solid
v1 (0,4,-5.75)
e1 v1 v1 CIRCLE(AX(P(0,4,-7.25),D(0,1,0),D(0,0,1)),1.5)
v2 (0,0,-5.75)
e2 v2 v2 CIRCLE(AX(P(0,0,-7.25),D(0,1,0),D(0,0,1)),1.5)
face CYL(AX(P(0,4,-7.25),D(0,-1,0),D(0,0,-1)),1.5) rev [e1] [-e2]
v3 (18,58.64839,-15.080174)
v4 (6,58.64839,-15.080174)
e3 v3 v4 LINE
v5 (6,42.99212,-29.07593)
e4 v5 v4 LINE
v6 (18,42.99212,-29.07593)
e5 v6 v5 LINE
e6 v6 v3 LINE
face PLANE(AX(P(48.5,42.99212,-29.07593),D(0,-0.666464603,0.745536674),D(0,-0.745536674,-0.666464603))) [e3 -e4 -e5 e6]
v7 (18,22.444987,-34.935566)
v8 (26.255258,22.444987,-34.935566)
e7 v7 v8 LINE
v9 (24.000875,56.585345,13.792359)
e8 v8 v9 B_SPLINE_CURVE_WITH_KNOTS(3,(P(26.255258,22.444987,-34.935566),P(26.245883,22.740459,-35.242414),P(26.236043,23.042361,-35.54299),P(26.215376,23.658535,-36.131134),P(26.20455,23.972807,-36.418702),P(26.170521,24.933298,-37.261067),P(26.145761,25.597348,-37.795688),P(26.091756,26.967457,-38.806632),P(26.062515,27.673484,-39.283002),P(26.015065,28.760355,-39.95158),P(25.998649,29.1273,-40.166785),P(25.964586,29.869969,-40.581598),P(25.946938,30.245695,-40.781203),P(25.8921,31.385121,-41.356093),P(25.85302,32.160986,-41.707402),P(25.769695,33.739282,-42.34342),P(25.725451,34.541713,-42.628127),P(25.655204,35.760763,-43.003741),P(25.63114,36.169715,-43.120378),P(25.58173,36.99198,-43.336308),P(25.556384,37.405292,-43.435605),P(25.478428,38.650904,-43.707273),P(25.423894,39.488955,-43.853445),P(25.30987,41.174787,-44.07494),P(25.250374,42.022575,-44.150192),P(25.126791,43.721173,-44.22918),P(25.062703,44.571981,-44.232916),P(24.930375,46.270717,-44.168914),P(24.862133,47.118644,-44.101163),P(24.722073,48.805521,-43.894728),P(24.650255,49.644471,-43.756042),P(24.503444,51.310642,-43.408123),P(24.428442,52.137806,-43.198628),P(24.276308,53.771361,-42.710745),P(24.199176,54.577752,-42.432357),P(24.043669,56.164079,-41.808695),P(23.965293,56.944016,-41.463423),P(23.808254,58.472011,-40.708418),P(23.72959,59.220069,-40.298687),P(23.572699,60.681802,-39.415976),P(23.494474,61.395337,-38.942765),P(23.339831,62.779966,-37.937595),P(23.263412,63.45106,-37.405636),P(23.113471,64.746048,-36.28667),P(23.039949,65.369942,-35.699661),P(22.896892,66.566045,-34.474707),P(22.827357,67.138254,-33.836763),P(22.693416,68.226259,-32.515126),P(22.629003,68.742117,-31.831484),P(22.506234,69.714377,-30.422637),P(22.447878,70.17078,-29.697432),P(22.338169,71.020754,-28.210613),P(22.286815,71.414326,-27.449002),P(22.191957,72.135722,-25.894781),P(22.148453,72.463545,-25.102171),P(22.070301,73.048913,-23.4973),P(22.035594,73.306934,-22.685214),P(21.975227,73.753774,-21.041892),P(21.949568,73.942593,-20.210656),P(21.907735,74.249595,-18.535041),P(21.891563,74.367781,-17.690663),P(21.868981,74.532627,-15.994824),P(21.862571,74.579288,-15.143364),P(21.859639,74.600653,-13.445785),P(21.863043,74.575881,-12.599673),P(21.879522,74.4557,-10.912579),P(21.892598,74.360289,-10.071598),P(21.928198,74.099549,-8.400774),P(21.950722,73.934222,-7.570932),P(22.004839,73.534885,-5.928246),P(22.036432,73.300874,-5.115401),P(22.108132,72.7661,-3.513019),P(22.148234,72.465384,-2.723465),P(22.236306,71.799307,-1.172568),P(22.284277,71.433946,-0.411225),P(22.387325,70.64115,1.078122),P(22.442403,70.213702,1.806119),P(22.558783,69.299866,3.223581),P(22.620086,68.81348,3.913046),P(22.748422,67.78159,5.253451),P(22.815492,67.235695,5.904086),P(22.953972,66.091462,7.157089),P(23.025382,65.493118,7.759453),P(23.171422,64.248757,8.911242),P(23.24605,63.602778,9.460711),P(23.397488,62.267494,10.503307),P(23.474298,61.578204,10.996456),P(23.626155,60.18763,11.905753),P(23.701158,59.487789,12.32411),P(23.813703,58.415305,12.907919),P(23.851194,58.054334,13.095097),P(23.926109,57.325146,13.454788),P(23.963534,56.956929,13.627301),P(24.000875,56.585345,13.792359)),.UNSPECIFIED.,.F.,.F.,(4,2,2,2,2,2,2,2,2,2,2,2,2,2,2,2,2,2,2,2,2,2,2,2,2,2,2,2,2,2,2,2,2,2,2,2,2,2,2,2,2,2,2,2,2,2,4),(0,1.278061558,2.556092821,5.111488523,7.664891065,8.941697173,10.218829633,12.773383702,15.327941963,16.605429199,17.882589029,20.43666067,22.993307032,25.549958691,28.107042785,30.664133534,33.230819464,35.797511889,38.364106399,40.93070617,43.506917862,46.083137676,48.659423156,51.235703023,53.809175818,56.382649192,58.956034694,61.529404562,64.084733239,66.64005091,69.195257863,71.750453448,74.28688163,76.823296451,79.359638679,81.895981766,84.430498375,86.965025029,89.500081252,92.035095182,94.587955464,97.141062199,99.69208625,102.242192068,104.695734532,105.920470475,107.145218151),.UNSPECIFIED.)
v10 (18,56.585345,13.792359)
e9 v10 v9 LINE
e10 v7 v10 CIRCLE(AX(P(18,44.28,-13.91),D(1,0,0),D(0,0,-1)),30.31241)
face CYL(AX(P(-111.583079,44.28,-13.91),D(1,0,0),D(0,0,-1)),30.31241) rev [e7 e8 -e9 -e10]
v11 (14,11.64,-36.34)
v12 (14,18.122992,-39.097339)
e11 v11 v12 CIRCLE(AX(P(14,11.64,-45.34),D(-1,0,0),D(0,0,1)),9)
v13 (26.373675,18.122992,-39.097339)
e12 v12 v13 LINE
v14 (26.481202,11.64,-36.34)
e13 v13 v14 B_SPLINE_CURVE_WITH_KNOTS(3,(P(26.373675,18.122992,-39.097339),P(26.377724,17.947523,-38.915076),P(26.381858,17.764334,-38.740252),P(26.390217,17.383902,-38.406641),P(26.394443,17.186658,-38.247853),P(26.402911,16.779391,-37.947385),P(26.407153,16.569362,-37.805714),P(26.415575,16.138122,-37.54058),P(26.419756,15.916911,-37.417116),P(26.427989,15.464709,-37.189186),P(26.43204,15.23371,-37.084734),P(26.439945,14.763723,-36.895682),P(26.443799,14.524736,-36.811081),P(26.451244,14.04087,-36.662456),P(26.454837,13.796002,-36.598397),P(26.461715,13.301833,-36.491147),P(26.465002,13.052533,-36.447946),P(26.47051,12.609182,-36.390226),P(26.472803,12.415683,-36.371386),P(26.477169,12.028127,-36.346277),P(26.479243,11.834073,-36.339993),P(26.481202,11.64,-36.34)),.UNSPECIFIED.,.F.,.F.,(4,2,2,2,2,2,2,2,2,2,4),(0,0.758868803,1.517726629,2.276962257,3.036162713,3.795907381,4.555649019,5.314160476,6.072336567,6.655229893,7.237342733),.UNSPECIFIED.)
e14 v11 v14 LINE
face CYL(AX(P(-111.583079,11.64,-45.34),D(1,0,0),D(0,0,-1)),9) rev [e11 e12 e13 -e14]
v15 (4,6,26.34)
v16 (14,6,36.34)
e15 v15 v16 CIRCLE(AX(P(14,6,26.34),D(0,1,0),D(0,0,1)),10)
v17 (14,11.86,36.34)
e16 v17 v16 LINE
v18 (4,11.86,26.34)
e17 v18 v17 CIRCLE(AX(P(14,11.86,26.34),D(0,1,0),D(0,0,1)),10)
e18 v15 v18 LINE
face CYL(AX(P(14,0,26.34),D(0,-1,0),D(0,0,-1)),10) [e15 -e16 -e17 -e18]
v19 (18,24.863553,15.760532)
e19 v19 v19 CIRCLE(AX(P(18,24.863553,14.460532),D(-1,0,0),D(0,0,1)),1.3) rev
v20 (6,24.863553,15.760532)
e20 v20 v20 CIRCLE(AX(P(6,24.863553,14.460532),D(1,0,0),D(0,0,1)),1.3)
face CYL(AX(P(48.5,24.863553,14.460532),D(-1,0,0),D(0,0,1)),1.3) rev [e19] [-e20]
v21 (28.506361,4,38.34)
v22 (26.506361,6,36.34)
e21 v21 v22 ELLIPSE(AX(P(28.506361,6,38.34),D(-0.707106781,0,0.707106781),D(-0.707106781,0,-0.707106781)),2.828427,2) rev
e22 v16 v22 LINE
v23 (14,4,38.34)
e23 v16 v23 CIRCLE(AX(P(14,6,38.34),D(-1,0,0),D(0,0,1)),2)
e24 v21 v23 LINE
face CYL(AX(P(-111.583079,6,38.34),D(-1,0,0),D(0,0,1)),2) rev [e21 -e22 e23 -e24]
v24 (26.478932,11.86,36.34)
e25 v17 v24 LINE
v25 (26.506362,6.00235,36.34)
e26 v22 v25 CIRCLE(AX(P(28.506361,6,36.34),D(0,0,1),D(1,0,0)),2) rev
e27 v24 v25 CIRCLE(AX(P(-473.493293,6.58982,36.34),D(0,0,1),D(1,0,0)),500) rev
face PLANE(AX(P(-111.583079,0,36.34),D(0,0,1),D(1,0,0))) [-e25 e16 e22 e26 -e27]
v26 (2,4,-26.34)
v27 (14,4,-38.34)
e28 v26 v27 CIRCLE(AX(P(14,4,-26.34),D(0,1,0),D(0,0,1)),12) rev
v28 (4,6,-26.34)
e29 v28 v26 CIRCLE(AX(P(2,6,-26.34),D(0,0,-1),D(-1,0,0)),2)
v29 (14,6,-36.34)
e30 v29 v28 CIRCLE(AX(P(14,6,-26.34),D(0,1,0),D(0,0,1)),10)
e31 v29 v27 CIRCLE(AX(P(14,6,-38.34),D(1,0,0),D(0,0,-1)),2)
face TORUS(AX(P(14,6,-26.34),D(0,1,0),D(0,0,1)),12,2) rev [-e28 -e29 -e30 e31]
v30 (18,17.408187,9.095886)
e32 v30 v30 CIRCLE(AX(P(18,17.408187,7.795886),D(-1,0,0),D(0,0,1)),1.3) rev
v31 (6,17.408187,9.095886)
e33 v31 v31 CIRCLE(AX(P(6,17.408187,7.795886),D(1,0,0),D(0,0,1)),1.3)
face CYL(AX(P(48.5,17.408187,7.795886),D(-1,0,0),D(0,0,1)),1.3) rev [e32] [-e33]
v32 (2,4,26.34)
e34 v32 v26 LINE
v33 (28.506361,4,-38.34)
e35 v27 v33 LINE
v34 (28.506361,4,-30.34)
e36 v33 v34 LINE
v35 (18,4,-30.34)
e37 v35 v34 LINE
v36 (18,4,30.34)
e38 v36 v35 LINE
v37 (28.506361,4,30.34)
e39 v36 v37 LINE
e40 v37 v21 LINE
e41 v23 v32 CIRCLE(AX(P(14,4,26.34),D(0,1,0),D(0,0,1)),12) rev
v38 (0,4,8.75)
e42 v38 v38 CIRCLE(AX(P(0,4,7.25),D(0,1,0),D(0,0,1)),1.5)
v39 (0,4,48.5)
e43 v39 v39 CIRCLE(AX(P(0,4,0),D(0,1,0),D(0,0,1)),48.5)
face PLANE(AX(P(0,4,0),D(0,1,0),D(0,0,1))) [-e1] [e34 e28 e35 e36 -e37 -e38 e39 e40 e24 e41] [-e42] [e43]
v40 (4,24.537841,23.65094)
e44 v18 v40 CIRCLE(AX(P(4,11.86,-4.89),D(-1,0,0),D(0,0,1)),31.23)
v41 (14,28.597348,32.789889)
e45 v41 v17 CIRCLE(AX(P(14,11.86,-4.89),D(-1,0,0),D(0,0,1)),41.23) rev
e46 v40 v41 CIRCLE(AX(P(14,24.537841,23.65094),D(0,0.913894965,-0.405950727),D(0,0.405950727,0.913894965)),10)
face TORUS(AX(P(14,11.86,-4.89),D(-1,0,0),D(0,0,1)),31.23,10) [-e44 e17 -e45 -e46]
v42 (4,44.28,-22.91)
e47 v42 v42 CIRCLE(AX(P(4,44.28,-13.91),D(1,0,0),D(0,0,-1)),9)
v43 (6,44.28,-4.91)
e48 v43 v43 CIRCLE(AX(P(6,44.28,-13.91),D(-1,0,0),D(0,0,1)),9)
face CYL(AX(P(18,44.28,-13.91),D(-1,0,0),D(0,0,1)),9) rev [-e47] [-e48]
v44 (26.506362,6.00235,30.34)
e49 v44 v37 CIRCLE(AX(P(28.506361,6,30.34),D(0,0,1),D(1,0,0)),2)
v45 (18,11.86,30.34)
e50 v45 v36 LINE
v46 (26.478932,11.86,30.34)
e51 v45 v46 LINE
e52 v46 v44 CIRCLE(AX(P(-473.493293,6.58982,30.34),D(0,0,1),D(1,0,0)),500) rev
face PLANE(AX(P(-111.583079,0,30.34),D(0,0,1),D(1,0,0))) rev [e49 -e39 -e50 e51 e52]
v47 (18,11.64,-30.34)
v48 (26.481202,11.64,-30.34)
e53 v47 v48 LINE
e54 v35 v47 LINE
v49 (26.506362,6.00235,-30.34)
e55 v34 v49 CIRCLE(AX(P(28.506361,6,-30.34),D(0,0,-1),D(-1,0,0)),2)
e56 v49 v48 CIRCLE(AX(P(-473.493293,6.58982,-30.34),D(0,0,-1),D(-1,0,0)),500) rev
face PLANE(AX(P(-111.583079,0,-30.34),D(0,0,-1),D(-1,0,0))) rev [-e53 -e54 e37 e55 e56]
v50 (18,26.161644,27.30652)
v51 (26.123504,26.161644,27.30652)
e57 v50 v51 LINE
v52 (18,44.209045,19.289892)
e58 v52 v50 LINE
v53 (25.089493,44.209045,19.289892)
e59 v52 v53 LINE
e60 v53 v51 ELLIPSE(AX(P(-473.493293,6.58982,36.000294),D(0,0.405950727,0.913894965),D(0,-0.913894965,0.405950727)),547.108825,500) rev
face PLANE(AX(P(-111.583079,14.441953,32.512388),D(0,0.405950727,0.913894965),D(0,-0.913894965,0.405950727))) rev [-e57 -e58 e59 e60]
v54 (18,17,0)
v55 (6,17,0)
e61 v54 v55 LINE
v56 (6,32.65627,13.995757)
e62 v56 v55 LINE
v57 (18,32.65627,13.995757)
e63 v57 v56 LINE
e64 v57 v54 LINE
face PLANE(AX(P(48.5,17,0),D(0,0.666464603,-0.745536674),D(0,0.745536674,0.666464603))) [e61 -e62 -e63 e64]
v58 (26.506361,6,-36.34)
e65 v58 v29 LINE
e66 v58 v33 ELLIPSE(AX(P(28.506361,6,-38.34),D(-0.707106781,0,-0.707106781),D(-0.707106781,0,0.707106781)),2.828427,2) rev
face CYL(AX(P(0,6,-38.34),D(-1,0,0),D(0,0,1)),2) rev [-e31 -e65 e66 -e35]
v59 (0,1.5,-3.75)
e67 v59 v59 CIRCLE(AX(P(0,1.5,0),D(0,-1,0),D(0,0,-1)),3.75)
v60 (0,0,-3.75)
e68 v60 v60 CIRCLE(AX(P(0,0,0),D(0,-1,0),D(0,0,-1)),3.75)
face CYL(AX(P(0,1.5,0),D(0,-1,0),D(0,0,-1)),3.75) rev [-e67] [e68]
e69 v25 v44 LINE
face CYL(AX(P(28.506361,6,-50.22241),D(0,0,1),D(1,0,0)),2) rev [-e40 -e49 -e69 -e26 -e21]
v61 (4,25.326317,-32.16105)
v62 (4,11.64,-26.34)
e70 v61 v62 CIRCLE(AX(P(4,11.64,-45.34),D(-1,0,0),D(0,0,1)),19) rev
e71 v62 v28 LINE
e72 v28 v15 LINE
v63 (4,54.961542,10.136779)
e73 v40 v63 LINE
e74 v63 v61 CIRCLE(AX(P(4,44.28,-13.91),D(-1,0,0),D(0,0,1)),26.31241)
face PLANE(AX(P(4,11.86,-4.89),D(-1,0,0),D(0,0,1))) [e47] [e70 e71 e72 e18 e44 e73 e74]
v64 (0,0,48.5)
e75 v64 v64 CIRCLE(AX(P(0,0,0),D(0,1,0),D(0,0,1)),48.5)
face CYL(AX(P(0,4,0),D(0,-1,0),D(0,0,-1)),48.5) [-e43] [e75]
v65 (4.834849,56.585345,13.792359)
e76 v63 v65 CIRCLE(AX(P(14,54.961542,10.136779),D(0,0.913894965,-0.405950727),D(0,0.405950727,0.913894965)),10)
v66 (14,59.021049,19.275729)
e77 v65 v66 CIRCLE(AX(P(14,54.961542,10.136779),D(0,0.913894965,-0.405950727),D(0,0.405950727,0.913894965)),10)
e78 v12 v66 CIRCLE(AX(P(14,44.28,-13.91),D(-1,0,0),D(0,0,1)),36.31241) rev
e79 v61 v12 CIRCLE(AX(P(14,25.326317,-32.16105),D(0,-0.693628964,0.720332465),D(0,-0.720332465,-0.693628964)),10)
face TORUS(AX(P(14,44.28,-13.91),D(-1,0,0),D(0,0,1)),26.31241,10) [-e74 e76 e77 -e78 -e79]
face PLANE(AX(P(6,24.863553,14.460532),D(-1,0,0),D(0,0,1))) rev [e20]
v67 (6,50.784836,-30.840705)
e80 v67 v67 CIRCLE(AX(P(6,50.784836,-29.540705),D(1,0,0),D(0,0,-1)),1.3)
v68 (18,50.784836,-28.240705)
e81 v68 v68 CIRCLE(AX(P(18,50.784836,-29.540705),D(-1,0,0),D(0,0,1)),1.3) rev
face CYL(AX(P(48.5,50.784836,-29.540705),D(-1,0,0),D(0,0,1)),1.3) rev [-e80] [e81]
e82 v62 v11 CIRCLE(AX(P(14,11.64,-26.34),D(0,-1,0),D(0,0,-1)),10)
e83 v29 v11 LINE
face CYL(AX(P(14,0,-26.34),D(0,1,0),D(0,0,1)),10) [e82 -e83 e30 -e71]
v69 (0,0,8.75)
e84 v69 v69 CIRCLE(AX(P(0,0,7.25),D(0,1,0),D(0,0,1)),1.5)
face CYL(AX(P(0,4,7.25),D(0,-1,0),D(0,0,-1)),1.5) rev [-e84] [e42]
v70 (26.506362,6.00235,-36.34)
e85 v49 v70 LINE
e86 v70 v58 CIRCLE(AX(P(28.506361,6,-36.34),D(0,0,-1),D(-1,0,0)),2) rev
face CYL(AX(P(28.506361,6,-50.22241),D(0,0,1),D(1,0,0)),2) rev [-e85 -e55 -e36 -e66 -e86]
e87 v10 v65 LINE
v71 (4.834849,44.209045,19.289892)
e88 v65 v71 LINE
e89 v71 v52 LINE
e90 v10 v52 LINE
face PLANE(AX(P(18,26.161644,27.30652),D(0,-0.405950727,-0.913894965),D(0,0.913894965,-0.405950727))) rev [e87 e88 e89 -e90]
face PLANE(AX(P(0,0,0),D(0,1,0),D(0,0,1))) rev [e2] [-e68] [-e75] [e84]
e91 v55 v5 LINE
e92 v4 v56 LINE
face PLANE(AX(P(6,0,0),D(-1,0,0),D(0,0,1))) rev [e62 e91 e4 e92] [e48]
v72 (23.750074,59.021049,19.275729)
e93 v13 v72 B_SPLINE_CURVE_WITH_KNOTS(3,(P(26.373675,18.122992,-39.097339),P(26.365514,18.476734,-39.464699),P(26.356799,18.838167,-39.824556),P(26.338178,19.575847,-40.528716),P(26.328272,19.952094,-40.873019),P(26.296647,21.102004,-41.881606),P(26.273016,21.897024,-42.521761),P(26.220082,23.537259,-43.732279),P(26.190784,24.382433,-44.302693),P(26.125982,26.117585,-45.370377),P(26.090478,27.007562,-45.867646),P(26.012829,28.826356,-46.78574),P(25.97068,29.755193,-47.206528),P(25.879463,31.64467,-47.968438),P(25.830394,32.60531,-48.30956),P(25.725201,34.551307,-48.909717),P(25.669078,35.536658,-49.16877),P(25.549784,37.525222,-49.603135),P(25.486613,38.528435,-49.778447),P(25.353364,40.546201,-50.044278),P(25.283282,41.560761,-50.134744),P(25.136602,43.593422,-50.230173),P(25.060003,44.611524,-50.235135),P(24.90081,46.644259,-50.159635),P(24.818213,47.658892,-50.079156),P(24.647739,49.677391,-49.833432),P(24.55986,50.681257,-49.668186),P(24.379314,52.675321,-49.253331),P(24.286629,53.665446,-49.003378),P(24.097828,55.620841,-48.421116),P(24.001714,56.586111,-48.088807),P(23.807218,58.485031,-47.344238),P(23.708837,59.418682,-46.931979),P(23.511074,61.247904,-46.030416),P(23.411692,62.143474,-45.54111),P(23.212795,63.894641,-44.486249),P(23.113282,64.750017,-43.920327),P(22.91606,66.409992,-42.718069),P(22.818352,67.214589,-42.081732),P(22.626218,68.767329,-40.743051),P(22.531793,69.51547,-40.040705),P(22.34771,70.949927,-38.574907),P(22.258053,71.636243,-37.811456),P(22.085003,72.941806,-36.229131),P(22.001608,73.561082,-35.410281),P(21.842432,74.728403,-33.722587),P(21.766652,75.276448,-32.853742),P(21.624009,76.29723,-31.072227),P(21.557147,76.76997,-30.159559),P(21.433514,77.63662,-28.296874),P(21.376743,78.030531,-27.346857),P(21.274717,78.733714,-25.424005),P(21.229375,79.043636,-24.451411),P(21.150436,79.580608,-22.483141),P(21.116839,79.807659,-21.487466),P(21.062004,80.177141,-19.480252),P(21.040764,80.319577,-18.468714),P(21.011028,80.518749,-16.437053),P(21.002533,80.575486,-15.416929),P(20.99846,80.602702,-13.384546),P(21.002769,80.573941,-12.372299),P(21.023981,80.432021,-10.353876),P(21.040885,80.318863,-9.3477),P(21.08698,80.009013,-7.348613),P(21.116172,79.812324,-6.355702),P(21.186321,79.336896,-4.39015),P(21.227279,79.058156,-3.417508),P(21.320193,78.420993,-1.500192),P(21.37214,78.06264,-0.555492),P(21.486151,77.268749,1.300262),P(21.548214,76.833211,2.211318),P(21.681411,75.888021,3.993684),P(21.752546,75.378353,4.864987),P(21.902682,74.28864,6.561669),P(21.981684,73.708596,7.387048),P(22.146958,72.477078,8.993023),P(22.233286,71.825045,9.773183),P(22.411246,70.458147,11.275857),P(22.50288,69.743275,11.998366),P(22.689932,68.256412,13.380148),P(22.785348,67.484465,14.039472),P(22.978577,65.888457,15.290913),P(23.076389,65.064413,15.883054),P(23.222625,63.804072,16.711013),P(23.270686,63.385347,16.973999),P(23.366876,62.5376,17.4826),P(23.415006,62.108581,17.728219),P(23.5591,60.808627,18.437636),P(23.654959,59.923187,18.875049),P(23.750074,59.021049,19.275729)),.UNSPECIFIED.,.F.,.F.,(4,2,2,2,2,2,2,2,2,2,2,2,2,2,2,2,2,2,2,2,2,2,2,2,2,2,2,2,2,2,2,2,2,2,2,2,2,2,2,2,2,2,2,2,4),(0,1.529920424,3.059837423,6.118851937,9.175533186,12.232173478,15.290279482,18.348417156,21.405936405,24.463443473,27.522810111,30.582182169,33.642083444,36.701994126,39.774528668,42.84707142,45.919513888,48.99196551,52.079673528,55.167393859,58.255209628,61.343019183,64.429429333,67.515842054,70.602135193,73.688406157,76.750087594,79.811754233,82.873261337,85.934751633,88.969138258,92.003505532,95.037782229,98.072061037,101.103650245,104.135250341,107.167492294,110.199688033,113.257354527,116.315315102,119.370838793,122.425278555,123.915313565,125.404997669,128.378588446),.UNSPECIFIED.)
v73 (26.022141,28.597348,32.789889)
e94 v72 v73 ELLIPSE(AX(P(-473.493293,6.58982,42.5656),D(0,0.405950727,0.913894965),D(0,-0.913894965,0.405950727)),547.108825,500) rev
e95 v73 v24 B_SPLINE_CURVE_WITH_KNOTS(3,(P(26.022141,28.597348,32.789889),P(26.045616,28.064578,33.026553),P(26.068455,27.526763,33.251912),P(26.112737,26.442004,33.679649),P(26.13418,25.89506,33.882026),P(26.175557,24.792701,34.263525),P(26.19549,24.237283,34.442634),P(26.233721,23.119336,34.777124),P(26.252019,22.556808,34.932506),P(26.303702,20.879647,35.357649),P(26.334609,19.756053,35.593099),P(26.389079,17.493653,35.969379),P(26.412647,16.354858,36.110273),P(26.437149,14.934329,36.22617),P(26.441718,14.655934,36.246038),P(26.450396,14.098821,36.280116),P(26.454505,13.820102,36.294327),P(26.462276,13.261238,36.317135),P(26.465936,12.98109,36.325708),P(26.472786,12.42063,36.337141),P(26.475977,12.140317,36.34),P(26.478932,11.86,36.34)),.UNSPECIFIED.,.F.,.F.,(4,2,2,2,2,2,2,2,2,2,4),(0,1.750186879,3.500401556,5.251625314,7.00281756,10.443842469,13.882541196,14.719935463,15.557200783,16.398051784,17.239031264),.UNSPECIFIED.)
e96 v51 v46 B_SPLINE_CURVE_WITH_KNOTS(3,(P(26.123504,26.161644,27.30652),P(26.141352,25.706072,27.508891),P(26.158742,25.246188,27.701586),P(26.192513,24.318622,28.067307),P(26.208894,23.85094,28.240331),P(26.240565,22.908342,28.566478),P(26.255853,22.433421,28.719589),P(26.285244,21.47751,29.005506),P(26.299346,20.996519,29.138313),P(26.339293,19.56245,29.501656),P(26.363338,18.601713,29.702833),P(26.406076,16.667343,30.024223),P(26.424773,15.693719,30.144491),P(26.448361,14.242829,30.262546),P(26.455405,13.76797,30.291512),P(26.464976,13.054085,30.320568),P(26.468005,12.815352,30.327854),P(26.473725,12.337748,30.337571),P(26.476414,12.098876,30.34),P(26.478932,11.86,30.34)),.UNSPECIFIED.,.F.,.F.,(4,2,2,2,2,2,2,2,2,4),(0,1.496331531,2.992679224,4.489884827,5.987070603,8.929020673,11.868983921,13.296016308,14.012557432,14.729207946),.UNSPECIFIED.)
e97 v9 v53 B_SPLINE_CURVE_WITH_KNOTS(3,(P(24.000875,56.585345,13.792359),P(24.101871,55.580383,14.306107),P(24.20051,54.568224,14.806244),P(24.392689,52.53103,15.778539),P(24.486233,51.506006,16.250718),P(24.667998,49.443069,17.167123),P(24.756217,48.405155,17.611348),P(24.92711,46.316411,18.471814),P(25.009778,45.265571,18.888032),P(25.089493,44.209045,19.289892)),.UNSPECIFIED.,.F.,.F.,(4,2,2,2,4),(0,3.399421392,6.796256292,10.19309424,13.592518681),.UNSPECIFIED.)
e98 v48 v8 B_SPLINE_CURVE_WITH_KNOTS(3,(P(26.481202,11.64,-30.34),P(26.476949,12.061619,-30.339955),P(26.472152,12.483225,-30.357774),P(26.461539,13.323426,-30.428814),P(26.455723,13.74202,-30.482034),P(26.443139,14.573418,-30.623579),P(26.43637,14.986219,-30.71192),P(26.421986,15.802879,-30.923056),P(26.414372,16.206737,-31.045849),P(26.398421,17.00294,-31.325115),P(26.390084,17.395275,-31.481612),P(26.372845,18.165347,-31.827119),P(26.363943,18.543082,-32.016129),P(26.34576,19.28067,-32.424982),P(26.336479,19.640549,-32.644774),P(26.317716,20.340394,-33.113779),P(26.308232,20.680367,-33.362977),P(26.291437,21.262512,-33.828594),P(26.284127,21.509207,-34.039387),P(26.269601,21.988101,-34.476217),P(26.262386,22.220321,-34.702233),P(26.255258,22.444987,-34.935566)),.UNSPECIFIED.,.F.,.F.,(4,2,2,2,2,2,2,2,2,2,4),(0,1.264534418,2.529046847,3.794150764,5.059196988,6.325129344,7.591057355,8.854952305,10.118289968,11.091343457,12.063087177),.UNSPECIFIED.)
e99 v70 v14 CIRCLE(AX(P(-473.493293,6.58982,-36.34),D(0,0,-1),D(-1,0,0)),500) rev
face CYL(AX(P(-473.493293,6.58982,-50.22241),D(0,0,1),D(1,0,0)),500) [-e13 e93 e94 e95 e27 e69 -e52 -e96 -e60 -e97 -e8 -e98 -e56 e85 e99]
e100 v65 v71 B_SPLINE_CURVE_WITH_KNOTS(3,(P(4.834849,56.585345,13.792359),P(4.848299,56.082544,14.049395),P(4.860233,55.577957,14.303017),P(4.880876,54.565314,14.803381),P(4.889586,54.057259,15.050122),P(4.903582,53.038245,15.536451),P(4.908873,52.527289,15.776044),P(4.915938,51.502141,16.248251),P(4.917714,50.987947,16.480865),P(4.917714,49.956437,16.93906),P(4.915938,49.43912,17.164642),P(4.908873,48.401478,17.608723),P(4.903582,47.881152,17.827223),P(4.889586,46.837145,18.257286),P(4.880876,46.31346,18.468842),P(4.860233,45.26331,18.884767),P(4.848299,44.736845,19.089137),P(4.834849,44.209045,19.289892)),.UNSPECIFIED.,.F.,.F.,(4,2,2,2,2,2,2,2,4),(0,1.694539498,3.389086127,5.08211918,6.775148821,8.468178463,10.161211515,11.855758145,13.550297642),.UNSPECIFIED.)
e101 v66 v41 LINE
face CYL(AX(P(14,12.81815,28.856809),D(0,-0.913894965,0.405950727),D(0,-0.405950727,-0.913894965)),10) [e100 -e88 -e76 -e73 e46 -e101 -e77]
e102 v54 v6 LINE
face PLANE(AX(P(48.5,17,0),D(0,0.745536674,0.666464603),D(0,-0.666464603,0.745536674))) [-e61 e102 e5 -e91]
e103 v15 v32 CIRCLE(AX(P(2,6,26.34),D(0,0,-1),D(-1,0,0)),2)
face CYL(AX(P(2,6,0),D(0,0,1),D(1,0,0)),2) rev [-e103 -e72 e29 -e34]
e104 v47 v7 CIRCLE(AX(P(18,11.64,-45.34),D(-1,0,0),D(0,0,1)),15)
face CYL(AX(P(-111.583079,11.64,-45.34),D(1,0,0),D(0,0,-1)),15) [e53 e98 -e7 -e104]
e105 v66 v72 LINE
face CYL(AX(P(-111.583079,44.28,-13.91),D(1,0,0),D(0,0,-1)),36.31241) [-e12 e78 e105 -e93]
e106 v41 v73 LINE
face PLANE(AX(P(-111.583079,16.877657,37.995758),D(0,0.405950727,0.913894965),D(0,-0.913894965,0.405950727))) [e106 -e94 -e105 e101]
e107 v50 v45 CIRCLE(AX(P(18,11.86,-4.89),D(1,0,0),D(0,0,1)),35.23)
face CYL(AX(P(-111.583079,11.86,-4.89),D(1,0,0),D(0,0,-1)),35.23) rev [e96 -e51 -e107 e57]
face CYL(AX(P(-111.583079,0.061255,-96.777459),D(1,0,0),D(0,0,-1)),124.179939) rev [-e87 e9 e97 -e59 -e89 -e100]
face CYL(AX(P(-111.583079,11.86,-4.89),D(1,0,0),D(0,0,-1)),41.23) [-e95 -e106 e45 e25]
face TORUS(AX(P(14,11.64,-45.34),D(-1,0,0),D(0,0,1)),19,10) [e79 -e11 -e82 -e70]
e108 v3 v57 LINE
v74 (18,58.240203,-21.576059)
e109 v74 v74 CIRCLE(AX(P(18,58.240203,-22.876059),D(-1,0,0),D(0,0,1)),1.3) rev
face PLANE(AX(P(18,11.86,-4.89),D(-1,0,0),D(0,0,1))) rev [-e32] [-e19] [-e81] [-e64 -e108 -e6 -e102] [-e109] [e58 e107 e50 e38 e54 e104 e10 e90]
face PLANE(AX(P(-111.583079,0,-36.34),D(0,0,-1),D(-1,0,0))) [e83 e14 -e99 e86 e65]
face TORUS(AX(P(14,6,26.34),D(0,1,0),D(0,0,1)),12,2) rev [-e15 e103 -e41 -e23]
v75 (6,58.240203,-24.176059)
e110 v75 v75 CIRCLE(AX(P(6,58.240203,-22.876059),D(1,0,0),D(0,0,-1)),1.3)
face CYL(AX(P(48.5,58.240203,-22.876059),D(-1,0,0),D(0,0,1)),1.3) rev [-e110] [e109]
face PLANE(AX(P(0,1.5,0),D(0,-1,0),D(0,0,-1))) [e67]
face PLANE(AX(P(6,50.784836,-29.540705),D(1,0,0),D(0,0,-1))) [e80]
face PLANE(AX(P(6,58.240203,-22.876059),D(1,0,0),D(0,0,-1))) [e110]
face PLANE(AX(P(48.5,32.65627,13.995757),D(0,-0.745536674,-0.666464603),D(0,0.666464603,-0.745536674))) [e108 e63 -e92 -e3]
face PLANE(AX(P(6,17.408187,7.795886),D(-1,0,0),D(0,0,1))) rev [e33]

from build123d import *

# Parameters (mm, degrees)
SKETCH2_R                       = 48.5
SKETCH2_R_2                     = 1.5000000000000002
BOSS_EXTRUDE1_DEPTH             = 4
SKETCH3_R                       = 3.75
CUT_EXTRUDE1_DEPTH              = 1.5
BOSS_EXTRUDE3_START             = 4
SKETCH5_R                       = 9
BOSS_EXTRUDE3_DEPTH             = 14
CUT_EXTRUDE2_START              = 6
SKETCH9_R                       = 1.299999999999999
SKETCH9_R_2                     = 1.3000000000000043
SKETCH9_R_3                     = 1.2999999999999887
CUT_EXTRUDE2_DEPTH              = 96.33374378554642
BOSS_EXTRUDE6_DEPTH             = 9
BOSS_EXTRUDE6_DIRECTION_2_REACH = 113.079
CUT_EXTRUDE3_DEPTH              = 107.62868758356173
CUT_EXTRUDE3_DEPTH_BACK         = 107.62868758356173
FILLET2_R                       = 10
FILLET3_R                       = 2
FILLET4_R                       = 2


# Some blends are built 0.0001 mm under size
with BuildPart() as part:
    # Sketch2 → Boss-Extrude1 (new body)
    with BuildSketch(Plane(origin=(0, 0, 0), x_dir=(1, 0, 0), z_dir=(0, 1, 0))):
        with Locations(Location((0, 0, 0), (0, 0, 270))):
            Circle(SKETCH2_R)
        with Locations(Location((-2.66e-15, 7.249999999999999, 0), (0, 0, 270))):
            Circle(SKETCH2_R_2, mode=Mode.SUBTRACT)
        with Locations(Location((0, -7.249999999999999, 0), (0, 0, 270))):
            Circle(SKETCH2_R_2, mode=Mode.SUBTRACT)
    extrude(amount=BOSS_EXTRUDE1_DEPTH)

    # Sketch3 → Cut-Extrude1 (cut)
    with BuildSketch(Plane.XZ):
        with Locations(Location((0, 0, 0), (0, 0, 270))):
            Circle(SKETCH3_R)
    extrude(amount=-CUT_EXTRUDE1_DEPTH, mode=Mode.SUBTRACT)

    # Sketch5 → Boss-Extrude3 (add)
    with BuildSketch(Plane(origin=(0, 0, 0), x_dir=(0, 0, -1), z_dir=(1, 0, 0)).offset(BOSS_EXTRUDE3_START)):
        with BuildLine():
            Line((30.34, 4), (-30.34, 4))
            Line((-30.34, 4), (-30.34, 11.860000000000001))
            ThreePointArc((-30.34, 11.860000000000001), (-29.57328688616134, 19.16990813910404), (-27.306519613843914, 26.161644127699585))
            Line((-27.306519613843914, 26.161644127699585), (-13.792358873261465, 56.585344889913266))
            ThreePointArc((-13.792358873261465, 56.585344889913266), (31.303559206891457, 69.10551707656947), (34.93556554151654, 22.444986978202348))
            ThreePointArc((34.93556554151654, 22.444986978202348), (31.53662148462827, 17.510838233282712), (30.34, 11.64))
            Line((30.34, 11.64), (30.34, 4))
        make_face()
        with Locations((13.909999999999995, 44.28)):
            Circle(SKETCH5_R, mode=Mode.SUBTRACT)
    extrude(amount=BOSS_EXTRUDE3_DEPTH)

    # Sketch9 → Cut-Extrude2 (cut, through all)
    with BuildSketch(Plane(origin=(0, 0, 0), x_dir=(0, 0, -1), z_dir=(1, 0, 0)).offset(CUT_EXTRUDE2_START)):
        with Locations(Location((29.540705350702062, 50.78483624530012, 0), (0, 0, 180))):
            Circle(SKETCH9_R)
        with Locations(Location((22.87605932116741, 58.24020299020328, 0), (0, 0, 180))):
            Circle(SKETCH9_R)
        with Locations(Location((-7.795885678067851, 17.4081866892785, 0), (0, 0, 180))):
            Circle(SKETCH9_R_2)
        with Locations(Location((-14.460531707602502, 24.86355343418166, 0), (0, 0, 180))):
            Circle(SKETCH9_R_3)
        Polygon((0, 17), (29.075930305122334, 42.99211951518514), (15.080173643099549, 58.648389679481774), (-13.99575666202277, 32.65627016429665), align=None)
    extrude(amount=CUT_EXTRUDE2_DEPTH, mode=Mode.SUBTRACT)

    # Sketch11 → Boss-Extrude6 (add)
    with BuildSketch(Plane(origin=(18.000000000000004, 0, 0), x_dir=(0, 0, -1), z_dir=(1, 0, 0))):
        with BuildLine():
            ThreePointArc((39.09733932490991, 18.12299218692141), (34.7464182617029, 74.01944844856713), (-19.27572866273243, 59.02104925455133))
            Line((-19.27572866273244, 59.021049254551315), (-32.78988940331492, 28.59734849233759))
            ThreePointArc((-32.78988940331492, 28.59734849233759), (-35.44270843929697, 20.41485417471641), (-36.34, 11.860000000000007))
            Line((-36.34, 11.860000000000007), (-36.34, 4))
            Line((-36.34, 4), (-30.34, 4.000000000000001))
            Line((-30.34, 4), (-30.34, 11.860000000000001))
            ThreePointArc((-30.339999999999996, 11.860000000000003), (-29.573286886161334, 19.169908139104034), (-27.30651961384391, 26.161644127699585))
            Line((-27.30651961384391, 26.161644127699585), (-19.28989223747492, 44.20904471014288))
            ThreePointArc((-19.289892237474774, 44.20904471014282), (-16.709962361716535, 50.472191847815), (-13.792358873261435, 56.58534488991329))
            ThreePointArc((-13.79235887326144, 56.58534488991327), (31.303559206891478, 69.10551707656947), (34.935565541516546, 22.444986978202333))
            ThreePointArc((34.93556554151654, 22.444986978202337), (31.536621484628263, 17.510838233282712), (30.339999999999996, 11.64))
            Line((30.34, 11.64), (30.34, 4))
            Line((30.34, 4), (36.34, 4))
            Line((36.34, 4), (36.34, 11.64))
            ThreePointArc((36.34, 11.64), (37.05797289077695, 15.162502939969631), (39.09733932490992, 18.122992186921408))
        make_face()
    extrude(amount=BOSS_EXTRUDE6_DEPTH)

    # Boss-Extrude6 direction 2: up to this face of the body (flat: up to its plane)
    boss_extrude6_direction_2_end = Plane(part.part.faces().sort_by_distance((4, 35.761181815, -7.797700276))[0])
    # Sketch11 → Boss-Extrude6 direction 2 (add, up to the picked face)
    with BuildSketch(Plane(origin=(18.000000000000004, 0, 0), x_dir=(0, 0, -1), z_dir=(1, 0, 0)), mode=Mode.PRIVATE) as boss_extrude6_direction_2_sk1:
        with BuildLine():
            ThreePointArc((39.09733932490991, 18.12299218692141), (34.7464182617029, 74.01944844856713), (-19.27572866273243, 59.02104925455133))
            Line((-19.27572866273244, 59.021049254551315), (-32.78988940331492, 28.59734849233759))
            ThreePointArc((-32.78988940331492, 28.59734849233759), (-35.44270843929697, 20.41485417471641), (-36.34, 11.860000000000007))
            Line((-36.34, 11.860000000000007), (-36.34, 4))
            Line((-36.34, 4), (-30.34, 4.000000000000001))
            Line((-30.34, 4), (-30.34, 11.860000000000001))
            ThreePointArc((-30.339999999999996, 11.860000000000003), (-29.573286886161334, 19.169908139104034), (-27.30651961384391, 26.161644127699585))
            Line((-27.30651961384391, 26.161644127699585), (-19.28989223747492, 44.20904471014288))
            ThreePointArc((-19.289892237474774, 44.20904471014282), (-16.709962361716535, 50.472191847815), (-13.792358873261435, 56.58534488991329))
            ThreePointArc((-13.79235887326144, 56.58534488991327), (31.303559206891478, 69.10551707656947), (34.935565541516546, 22.444986978202333))
            ThreePointArc((34.93556554151654, 22.444986978202337), (31.536621484628263, 17.510838233282712), (30.339999999999996, 11.64))
            Line((30.34, 11.64), (30.34, 4))
            Line((30.34, 4), (36.34, 4))
            Line((36.34, 4), (36.34, 11.64))
            ThreePointArc((36.34, 11.64), (37.05797289077695, 15.162502939969631), (39.09733932490992, 18.122992186921408))
        make_face()
    boss_extrude6_direction_2_tool1 = split(extrude(boss_extrude6_direction_2_sk1.sketch, amount=-BOSS_EXTRUDE6_DIRECTION_2_REACH, mode=Mode.PRIVATE), bisect_by=boss_extrude6_direction_2_end, keep=Keep.BOTH, mode=Mode.PRIVATE)
    add(boss_extrude6_direction_2_tool1.solids().sort_by(Axis((18, 73.072836, -34.083191), (-1, 0, 0)))[0])

    # Sketch14 → Cut-Extrude3 (cut, two sides: drawn at the far end of the back side and taken through both)
    with BuildSketch(Plane.XY.offset(-CUT_EXTRUDE3_DEPTH_BACK)):
        with BuildLine():
            Line((27.00000000000001, 80.59240999991061), (21.00000000000001, 80.59240999991061))
            ThreePointArc((21.00000000000001, 80.59240999991061), (25.222549691509585, 42.401946852226466), (26.500000000000004, 4))
            Line((26.500000000000004, 4), (27.000000000000004, 4))
            Line((27.000000000000004, 4), (27.00000000000001, 80.59240999991061))
        make_face()
    extrude(amount=CUT_EXTRUDE3_DEPTH + CUT_EXTRUDE3_DEPTH_BACK, mode=Mode.SUBTRACT)

    # Fillet2
    # the kernel refuses this fillet: 10 mm, written as the material it takes off along each edge
    with BuildSketch(Plane(origin=(4, 11.860000000000007, 36.34), x_dir=(0, 0, -1), z_dir=(0, -1, 0))) as fillet2_piece_1:
        with BuildLine():
            CenterArc((FILLET2_R, FILLET2_R), FILLET2_R, 180, 90)
            Line((0, FILLET2_R), (0, 0))
            Line((0, 0), (FILLET2_R, 0))
        make_face()
    extrude(amount=7.8600000000000065, mode=Mode.SUBTRACT)
    with BuildSketch(Plane(origin=(4, 11.86, -4.889999999999912), x_dir=(0, 0.4059507274396709, 0.9138949649118339), z_dir=(0, 0.9138949649118339, -0.4059507274396709))) as fillet2_piece_2:
        with BuildLine():
            CenterArc((41.22999999999991 - FILLET2_R, FILLET2_R), FILLET2_R, 270, 89.99999999999999)
            Line((41.22999999999991, FILLET2_R), (41.22999999999991, 0))
            Line((41.22999999999991, 0), (41.22999999999991 - FILLET2_R, 0))
        make_face()
    revolve(axis=Axis((4, 11.86, -4.889999999999912), (1, 0, 0)), revolution_arc=23.950718342801608, mode=Mode.SUBTRACT)
    with BuildSketch(Plane(origin=(4, 59.02104925455132, 19.275728662732437), x_dir=(0, -0.4059507274396704, -0.9138949649118341), z_dir=(0, -0.9138949649118341, 0.40595072743967037))) as fillet2_piece_3:
        with BuildLine():
            CenterArc((FILLET2_R, FILLET2_R), FILLET2_R, 180, 90)
            Line((-3.25e-15, FILLET2_R), (0, 0))
            Line((0, 0), (FILLET2_R, 0))
        make_face()
    extrude(amount=33.29015032394755, mode=Mode.SUBTRACT)
    with BuildSketch(Plane(origin=(4, 44.28, -13.909999999999988), x_dir=(0, -0.7203324652134898, -0.6936289638988963), z_dir=(0, -0.6936289638988963, 0.7203324652134898))) as fillet2_piece_4:
        with BuildLine():
            CenterArc((36.312409999910614 - FILLET2_R, FILLET2_R), FILLET2_R, 270, 89.99999999999999)
            Line((36.312409999910614, FILLET2_R), (36.312409999910614, 0))
            Line((36.312409999910614, 0), (36.312409999910614 - FILLET2_R, 0))
        make_face()
    revolve(axis=Axis((4, 44.28, -13.909999999999988), (1, 0, 0)), revolution_arc=202.13121786262028, mode=Mode.SUBTRACT)
    with BuildSketch(Plane(origin=(4, 4, -36.34), x_dir=(0, 0, 1), z_dir=(0, 1, 0))) as fillet2_piece_5:
        with BuildLine():
            CenterArc((FILLET2_R, FILLET2_R), FILLET2_R, 180, 90)
            Line((0, FILLET2_R), (0, 0))
            Line((0, 0), (FILLET2_R, 0))
        make_face()
    extrude(amount=7.640000000000001, mode=Mode.SUBTRACT)
    with BuildSketch(Plane(origin=(4, 11.640000000000043, -45.33999999999995), x_dir=(0, 0.7203324652134898, 0.6936289638988964), z_dir=(0, 0.6936289638988964, -0.7203324652134898))) as fillet2_piece_6:
        with BuildLine():
            CenterArc((8.999999999999945 + FILLET2_R, FILLET2_R), FILLET2_R, 180, 90)
            Line((8.999999999999941, FILLET2_R), (8.999999999999945, 0))
            Line((8.999999999999945, 0), (8.999999999999945 + FILLET2_R, 0))
        make_face()
    revolve(axis=Axis((4, 11.640000000000043, -45.33999999999995), (1, 0, 0)), revolution_arc=46.08193620542221, mode=Mode.SUBTRACT)

    # Fillet3
    fillet3_edges = [part.edges().sort_by_distance(p)[0] for p in [
        (20.250000000000014, 4, -36.34),
        (4, 4, 0),
        (20.250000000000014, 4, 36.34),
        (6.928932188134525, 4, -33.41106781186548),
        (6.928932188134525, 3.999999999999999, 33.41106781186548),
    ]]
    fillet(fillet3_edges, radius=FILLET3_R)

    # Fillet4
    fillet4_edges = [part.edges().sort_by_distance(p)[0] for p in [
        (26.500000000000032, 4.000000000000001, -34.34),
        (26.500000000000036, 4.000000000000001, 34.34),
    ]]
    fillet(fillet4_edges, radius=FILLET4_R - 0.0001)  # a hair under: the kernel refuses the full size


solid = part.part
